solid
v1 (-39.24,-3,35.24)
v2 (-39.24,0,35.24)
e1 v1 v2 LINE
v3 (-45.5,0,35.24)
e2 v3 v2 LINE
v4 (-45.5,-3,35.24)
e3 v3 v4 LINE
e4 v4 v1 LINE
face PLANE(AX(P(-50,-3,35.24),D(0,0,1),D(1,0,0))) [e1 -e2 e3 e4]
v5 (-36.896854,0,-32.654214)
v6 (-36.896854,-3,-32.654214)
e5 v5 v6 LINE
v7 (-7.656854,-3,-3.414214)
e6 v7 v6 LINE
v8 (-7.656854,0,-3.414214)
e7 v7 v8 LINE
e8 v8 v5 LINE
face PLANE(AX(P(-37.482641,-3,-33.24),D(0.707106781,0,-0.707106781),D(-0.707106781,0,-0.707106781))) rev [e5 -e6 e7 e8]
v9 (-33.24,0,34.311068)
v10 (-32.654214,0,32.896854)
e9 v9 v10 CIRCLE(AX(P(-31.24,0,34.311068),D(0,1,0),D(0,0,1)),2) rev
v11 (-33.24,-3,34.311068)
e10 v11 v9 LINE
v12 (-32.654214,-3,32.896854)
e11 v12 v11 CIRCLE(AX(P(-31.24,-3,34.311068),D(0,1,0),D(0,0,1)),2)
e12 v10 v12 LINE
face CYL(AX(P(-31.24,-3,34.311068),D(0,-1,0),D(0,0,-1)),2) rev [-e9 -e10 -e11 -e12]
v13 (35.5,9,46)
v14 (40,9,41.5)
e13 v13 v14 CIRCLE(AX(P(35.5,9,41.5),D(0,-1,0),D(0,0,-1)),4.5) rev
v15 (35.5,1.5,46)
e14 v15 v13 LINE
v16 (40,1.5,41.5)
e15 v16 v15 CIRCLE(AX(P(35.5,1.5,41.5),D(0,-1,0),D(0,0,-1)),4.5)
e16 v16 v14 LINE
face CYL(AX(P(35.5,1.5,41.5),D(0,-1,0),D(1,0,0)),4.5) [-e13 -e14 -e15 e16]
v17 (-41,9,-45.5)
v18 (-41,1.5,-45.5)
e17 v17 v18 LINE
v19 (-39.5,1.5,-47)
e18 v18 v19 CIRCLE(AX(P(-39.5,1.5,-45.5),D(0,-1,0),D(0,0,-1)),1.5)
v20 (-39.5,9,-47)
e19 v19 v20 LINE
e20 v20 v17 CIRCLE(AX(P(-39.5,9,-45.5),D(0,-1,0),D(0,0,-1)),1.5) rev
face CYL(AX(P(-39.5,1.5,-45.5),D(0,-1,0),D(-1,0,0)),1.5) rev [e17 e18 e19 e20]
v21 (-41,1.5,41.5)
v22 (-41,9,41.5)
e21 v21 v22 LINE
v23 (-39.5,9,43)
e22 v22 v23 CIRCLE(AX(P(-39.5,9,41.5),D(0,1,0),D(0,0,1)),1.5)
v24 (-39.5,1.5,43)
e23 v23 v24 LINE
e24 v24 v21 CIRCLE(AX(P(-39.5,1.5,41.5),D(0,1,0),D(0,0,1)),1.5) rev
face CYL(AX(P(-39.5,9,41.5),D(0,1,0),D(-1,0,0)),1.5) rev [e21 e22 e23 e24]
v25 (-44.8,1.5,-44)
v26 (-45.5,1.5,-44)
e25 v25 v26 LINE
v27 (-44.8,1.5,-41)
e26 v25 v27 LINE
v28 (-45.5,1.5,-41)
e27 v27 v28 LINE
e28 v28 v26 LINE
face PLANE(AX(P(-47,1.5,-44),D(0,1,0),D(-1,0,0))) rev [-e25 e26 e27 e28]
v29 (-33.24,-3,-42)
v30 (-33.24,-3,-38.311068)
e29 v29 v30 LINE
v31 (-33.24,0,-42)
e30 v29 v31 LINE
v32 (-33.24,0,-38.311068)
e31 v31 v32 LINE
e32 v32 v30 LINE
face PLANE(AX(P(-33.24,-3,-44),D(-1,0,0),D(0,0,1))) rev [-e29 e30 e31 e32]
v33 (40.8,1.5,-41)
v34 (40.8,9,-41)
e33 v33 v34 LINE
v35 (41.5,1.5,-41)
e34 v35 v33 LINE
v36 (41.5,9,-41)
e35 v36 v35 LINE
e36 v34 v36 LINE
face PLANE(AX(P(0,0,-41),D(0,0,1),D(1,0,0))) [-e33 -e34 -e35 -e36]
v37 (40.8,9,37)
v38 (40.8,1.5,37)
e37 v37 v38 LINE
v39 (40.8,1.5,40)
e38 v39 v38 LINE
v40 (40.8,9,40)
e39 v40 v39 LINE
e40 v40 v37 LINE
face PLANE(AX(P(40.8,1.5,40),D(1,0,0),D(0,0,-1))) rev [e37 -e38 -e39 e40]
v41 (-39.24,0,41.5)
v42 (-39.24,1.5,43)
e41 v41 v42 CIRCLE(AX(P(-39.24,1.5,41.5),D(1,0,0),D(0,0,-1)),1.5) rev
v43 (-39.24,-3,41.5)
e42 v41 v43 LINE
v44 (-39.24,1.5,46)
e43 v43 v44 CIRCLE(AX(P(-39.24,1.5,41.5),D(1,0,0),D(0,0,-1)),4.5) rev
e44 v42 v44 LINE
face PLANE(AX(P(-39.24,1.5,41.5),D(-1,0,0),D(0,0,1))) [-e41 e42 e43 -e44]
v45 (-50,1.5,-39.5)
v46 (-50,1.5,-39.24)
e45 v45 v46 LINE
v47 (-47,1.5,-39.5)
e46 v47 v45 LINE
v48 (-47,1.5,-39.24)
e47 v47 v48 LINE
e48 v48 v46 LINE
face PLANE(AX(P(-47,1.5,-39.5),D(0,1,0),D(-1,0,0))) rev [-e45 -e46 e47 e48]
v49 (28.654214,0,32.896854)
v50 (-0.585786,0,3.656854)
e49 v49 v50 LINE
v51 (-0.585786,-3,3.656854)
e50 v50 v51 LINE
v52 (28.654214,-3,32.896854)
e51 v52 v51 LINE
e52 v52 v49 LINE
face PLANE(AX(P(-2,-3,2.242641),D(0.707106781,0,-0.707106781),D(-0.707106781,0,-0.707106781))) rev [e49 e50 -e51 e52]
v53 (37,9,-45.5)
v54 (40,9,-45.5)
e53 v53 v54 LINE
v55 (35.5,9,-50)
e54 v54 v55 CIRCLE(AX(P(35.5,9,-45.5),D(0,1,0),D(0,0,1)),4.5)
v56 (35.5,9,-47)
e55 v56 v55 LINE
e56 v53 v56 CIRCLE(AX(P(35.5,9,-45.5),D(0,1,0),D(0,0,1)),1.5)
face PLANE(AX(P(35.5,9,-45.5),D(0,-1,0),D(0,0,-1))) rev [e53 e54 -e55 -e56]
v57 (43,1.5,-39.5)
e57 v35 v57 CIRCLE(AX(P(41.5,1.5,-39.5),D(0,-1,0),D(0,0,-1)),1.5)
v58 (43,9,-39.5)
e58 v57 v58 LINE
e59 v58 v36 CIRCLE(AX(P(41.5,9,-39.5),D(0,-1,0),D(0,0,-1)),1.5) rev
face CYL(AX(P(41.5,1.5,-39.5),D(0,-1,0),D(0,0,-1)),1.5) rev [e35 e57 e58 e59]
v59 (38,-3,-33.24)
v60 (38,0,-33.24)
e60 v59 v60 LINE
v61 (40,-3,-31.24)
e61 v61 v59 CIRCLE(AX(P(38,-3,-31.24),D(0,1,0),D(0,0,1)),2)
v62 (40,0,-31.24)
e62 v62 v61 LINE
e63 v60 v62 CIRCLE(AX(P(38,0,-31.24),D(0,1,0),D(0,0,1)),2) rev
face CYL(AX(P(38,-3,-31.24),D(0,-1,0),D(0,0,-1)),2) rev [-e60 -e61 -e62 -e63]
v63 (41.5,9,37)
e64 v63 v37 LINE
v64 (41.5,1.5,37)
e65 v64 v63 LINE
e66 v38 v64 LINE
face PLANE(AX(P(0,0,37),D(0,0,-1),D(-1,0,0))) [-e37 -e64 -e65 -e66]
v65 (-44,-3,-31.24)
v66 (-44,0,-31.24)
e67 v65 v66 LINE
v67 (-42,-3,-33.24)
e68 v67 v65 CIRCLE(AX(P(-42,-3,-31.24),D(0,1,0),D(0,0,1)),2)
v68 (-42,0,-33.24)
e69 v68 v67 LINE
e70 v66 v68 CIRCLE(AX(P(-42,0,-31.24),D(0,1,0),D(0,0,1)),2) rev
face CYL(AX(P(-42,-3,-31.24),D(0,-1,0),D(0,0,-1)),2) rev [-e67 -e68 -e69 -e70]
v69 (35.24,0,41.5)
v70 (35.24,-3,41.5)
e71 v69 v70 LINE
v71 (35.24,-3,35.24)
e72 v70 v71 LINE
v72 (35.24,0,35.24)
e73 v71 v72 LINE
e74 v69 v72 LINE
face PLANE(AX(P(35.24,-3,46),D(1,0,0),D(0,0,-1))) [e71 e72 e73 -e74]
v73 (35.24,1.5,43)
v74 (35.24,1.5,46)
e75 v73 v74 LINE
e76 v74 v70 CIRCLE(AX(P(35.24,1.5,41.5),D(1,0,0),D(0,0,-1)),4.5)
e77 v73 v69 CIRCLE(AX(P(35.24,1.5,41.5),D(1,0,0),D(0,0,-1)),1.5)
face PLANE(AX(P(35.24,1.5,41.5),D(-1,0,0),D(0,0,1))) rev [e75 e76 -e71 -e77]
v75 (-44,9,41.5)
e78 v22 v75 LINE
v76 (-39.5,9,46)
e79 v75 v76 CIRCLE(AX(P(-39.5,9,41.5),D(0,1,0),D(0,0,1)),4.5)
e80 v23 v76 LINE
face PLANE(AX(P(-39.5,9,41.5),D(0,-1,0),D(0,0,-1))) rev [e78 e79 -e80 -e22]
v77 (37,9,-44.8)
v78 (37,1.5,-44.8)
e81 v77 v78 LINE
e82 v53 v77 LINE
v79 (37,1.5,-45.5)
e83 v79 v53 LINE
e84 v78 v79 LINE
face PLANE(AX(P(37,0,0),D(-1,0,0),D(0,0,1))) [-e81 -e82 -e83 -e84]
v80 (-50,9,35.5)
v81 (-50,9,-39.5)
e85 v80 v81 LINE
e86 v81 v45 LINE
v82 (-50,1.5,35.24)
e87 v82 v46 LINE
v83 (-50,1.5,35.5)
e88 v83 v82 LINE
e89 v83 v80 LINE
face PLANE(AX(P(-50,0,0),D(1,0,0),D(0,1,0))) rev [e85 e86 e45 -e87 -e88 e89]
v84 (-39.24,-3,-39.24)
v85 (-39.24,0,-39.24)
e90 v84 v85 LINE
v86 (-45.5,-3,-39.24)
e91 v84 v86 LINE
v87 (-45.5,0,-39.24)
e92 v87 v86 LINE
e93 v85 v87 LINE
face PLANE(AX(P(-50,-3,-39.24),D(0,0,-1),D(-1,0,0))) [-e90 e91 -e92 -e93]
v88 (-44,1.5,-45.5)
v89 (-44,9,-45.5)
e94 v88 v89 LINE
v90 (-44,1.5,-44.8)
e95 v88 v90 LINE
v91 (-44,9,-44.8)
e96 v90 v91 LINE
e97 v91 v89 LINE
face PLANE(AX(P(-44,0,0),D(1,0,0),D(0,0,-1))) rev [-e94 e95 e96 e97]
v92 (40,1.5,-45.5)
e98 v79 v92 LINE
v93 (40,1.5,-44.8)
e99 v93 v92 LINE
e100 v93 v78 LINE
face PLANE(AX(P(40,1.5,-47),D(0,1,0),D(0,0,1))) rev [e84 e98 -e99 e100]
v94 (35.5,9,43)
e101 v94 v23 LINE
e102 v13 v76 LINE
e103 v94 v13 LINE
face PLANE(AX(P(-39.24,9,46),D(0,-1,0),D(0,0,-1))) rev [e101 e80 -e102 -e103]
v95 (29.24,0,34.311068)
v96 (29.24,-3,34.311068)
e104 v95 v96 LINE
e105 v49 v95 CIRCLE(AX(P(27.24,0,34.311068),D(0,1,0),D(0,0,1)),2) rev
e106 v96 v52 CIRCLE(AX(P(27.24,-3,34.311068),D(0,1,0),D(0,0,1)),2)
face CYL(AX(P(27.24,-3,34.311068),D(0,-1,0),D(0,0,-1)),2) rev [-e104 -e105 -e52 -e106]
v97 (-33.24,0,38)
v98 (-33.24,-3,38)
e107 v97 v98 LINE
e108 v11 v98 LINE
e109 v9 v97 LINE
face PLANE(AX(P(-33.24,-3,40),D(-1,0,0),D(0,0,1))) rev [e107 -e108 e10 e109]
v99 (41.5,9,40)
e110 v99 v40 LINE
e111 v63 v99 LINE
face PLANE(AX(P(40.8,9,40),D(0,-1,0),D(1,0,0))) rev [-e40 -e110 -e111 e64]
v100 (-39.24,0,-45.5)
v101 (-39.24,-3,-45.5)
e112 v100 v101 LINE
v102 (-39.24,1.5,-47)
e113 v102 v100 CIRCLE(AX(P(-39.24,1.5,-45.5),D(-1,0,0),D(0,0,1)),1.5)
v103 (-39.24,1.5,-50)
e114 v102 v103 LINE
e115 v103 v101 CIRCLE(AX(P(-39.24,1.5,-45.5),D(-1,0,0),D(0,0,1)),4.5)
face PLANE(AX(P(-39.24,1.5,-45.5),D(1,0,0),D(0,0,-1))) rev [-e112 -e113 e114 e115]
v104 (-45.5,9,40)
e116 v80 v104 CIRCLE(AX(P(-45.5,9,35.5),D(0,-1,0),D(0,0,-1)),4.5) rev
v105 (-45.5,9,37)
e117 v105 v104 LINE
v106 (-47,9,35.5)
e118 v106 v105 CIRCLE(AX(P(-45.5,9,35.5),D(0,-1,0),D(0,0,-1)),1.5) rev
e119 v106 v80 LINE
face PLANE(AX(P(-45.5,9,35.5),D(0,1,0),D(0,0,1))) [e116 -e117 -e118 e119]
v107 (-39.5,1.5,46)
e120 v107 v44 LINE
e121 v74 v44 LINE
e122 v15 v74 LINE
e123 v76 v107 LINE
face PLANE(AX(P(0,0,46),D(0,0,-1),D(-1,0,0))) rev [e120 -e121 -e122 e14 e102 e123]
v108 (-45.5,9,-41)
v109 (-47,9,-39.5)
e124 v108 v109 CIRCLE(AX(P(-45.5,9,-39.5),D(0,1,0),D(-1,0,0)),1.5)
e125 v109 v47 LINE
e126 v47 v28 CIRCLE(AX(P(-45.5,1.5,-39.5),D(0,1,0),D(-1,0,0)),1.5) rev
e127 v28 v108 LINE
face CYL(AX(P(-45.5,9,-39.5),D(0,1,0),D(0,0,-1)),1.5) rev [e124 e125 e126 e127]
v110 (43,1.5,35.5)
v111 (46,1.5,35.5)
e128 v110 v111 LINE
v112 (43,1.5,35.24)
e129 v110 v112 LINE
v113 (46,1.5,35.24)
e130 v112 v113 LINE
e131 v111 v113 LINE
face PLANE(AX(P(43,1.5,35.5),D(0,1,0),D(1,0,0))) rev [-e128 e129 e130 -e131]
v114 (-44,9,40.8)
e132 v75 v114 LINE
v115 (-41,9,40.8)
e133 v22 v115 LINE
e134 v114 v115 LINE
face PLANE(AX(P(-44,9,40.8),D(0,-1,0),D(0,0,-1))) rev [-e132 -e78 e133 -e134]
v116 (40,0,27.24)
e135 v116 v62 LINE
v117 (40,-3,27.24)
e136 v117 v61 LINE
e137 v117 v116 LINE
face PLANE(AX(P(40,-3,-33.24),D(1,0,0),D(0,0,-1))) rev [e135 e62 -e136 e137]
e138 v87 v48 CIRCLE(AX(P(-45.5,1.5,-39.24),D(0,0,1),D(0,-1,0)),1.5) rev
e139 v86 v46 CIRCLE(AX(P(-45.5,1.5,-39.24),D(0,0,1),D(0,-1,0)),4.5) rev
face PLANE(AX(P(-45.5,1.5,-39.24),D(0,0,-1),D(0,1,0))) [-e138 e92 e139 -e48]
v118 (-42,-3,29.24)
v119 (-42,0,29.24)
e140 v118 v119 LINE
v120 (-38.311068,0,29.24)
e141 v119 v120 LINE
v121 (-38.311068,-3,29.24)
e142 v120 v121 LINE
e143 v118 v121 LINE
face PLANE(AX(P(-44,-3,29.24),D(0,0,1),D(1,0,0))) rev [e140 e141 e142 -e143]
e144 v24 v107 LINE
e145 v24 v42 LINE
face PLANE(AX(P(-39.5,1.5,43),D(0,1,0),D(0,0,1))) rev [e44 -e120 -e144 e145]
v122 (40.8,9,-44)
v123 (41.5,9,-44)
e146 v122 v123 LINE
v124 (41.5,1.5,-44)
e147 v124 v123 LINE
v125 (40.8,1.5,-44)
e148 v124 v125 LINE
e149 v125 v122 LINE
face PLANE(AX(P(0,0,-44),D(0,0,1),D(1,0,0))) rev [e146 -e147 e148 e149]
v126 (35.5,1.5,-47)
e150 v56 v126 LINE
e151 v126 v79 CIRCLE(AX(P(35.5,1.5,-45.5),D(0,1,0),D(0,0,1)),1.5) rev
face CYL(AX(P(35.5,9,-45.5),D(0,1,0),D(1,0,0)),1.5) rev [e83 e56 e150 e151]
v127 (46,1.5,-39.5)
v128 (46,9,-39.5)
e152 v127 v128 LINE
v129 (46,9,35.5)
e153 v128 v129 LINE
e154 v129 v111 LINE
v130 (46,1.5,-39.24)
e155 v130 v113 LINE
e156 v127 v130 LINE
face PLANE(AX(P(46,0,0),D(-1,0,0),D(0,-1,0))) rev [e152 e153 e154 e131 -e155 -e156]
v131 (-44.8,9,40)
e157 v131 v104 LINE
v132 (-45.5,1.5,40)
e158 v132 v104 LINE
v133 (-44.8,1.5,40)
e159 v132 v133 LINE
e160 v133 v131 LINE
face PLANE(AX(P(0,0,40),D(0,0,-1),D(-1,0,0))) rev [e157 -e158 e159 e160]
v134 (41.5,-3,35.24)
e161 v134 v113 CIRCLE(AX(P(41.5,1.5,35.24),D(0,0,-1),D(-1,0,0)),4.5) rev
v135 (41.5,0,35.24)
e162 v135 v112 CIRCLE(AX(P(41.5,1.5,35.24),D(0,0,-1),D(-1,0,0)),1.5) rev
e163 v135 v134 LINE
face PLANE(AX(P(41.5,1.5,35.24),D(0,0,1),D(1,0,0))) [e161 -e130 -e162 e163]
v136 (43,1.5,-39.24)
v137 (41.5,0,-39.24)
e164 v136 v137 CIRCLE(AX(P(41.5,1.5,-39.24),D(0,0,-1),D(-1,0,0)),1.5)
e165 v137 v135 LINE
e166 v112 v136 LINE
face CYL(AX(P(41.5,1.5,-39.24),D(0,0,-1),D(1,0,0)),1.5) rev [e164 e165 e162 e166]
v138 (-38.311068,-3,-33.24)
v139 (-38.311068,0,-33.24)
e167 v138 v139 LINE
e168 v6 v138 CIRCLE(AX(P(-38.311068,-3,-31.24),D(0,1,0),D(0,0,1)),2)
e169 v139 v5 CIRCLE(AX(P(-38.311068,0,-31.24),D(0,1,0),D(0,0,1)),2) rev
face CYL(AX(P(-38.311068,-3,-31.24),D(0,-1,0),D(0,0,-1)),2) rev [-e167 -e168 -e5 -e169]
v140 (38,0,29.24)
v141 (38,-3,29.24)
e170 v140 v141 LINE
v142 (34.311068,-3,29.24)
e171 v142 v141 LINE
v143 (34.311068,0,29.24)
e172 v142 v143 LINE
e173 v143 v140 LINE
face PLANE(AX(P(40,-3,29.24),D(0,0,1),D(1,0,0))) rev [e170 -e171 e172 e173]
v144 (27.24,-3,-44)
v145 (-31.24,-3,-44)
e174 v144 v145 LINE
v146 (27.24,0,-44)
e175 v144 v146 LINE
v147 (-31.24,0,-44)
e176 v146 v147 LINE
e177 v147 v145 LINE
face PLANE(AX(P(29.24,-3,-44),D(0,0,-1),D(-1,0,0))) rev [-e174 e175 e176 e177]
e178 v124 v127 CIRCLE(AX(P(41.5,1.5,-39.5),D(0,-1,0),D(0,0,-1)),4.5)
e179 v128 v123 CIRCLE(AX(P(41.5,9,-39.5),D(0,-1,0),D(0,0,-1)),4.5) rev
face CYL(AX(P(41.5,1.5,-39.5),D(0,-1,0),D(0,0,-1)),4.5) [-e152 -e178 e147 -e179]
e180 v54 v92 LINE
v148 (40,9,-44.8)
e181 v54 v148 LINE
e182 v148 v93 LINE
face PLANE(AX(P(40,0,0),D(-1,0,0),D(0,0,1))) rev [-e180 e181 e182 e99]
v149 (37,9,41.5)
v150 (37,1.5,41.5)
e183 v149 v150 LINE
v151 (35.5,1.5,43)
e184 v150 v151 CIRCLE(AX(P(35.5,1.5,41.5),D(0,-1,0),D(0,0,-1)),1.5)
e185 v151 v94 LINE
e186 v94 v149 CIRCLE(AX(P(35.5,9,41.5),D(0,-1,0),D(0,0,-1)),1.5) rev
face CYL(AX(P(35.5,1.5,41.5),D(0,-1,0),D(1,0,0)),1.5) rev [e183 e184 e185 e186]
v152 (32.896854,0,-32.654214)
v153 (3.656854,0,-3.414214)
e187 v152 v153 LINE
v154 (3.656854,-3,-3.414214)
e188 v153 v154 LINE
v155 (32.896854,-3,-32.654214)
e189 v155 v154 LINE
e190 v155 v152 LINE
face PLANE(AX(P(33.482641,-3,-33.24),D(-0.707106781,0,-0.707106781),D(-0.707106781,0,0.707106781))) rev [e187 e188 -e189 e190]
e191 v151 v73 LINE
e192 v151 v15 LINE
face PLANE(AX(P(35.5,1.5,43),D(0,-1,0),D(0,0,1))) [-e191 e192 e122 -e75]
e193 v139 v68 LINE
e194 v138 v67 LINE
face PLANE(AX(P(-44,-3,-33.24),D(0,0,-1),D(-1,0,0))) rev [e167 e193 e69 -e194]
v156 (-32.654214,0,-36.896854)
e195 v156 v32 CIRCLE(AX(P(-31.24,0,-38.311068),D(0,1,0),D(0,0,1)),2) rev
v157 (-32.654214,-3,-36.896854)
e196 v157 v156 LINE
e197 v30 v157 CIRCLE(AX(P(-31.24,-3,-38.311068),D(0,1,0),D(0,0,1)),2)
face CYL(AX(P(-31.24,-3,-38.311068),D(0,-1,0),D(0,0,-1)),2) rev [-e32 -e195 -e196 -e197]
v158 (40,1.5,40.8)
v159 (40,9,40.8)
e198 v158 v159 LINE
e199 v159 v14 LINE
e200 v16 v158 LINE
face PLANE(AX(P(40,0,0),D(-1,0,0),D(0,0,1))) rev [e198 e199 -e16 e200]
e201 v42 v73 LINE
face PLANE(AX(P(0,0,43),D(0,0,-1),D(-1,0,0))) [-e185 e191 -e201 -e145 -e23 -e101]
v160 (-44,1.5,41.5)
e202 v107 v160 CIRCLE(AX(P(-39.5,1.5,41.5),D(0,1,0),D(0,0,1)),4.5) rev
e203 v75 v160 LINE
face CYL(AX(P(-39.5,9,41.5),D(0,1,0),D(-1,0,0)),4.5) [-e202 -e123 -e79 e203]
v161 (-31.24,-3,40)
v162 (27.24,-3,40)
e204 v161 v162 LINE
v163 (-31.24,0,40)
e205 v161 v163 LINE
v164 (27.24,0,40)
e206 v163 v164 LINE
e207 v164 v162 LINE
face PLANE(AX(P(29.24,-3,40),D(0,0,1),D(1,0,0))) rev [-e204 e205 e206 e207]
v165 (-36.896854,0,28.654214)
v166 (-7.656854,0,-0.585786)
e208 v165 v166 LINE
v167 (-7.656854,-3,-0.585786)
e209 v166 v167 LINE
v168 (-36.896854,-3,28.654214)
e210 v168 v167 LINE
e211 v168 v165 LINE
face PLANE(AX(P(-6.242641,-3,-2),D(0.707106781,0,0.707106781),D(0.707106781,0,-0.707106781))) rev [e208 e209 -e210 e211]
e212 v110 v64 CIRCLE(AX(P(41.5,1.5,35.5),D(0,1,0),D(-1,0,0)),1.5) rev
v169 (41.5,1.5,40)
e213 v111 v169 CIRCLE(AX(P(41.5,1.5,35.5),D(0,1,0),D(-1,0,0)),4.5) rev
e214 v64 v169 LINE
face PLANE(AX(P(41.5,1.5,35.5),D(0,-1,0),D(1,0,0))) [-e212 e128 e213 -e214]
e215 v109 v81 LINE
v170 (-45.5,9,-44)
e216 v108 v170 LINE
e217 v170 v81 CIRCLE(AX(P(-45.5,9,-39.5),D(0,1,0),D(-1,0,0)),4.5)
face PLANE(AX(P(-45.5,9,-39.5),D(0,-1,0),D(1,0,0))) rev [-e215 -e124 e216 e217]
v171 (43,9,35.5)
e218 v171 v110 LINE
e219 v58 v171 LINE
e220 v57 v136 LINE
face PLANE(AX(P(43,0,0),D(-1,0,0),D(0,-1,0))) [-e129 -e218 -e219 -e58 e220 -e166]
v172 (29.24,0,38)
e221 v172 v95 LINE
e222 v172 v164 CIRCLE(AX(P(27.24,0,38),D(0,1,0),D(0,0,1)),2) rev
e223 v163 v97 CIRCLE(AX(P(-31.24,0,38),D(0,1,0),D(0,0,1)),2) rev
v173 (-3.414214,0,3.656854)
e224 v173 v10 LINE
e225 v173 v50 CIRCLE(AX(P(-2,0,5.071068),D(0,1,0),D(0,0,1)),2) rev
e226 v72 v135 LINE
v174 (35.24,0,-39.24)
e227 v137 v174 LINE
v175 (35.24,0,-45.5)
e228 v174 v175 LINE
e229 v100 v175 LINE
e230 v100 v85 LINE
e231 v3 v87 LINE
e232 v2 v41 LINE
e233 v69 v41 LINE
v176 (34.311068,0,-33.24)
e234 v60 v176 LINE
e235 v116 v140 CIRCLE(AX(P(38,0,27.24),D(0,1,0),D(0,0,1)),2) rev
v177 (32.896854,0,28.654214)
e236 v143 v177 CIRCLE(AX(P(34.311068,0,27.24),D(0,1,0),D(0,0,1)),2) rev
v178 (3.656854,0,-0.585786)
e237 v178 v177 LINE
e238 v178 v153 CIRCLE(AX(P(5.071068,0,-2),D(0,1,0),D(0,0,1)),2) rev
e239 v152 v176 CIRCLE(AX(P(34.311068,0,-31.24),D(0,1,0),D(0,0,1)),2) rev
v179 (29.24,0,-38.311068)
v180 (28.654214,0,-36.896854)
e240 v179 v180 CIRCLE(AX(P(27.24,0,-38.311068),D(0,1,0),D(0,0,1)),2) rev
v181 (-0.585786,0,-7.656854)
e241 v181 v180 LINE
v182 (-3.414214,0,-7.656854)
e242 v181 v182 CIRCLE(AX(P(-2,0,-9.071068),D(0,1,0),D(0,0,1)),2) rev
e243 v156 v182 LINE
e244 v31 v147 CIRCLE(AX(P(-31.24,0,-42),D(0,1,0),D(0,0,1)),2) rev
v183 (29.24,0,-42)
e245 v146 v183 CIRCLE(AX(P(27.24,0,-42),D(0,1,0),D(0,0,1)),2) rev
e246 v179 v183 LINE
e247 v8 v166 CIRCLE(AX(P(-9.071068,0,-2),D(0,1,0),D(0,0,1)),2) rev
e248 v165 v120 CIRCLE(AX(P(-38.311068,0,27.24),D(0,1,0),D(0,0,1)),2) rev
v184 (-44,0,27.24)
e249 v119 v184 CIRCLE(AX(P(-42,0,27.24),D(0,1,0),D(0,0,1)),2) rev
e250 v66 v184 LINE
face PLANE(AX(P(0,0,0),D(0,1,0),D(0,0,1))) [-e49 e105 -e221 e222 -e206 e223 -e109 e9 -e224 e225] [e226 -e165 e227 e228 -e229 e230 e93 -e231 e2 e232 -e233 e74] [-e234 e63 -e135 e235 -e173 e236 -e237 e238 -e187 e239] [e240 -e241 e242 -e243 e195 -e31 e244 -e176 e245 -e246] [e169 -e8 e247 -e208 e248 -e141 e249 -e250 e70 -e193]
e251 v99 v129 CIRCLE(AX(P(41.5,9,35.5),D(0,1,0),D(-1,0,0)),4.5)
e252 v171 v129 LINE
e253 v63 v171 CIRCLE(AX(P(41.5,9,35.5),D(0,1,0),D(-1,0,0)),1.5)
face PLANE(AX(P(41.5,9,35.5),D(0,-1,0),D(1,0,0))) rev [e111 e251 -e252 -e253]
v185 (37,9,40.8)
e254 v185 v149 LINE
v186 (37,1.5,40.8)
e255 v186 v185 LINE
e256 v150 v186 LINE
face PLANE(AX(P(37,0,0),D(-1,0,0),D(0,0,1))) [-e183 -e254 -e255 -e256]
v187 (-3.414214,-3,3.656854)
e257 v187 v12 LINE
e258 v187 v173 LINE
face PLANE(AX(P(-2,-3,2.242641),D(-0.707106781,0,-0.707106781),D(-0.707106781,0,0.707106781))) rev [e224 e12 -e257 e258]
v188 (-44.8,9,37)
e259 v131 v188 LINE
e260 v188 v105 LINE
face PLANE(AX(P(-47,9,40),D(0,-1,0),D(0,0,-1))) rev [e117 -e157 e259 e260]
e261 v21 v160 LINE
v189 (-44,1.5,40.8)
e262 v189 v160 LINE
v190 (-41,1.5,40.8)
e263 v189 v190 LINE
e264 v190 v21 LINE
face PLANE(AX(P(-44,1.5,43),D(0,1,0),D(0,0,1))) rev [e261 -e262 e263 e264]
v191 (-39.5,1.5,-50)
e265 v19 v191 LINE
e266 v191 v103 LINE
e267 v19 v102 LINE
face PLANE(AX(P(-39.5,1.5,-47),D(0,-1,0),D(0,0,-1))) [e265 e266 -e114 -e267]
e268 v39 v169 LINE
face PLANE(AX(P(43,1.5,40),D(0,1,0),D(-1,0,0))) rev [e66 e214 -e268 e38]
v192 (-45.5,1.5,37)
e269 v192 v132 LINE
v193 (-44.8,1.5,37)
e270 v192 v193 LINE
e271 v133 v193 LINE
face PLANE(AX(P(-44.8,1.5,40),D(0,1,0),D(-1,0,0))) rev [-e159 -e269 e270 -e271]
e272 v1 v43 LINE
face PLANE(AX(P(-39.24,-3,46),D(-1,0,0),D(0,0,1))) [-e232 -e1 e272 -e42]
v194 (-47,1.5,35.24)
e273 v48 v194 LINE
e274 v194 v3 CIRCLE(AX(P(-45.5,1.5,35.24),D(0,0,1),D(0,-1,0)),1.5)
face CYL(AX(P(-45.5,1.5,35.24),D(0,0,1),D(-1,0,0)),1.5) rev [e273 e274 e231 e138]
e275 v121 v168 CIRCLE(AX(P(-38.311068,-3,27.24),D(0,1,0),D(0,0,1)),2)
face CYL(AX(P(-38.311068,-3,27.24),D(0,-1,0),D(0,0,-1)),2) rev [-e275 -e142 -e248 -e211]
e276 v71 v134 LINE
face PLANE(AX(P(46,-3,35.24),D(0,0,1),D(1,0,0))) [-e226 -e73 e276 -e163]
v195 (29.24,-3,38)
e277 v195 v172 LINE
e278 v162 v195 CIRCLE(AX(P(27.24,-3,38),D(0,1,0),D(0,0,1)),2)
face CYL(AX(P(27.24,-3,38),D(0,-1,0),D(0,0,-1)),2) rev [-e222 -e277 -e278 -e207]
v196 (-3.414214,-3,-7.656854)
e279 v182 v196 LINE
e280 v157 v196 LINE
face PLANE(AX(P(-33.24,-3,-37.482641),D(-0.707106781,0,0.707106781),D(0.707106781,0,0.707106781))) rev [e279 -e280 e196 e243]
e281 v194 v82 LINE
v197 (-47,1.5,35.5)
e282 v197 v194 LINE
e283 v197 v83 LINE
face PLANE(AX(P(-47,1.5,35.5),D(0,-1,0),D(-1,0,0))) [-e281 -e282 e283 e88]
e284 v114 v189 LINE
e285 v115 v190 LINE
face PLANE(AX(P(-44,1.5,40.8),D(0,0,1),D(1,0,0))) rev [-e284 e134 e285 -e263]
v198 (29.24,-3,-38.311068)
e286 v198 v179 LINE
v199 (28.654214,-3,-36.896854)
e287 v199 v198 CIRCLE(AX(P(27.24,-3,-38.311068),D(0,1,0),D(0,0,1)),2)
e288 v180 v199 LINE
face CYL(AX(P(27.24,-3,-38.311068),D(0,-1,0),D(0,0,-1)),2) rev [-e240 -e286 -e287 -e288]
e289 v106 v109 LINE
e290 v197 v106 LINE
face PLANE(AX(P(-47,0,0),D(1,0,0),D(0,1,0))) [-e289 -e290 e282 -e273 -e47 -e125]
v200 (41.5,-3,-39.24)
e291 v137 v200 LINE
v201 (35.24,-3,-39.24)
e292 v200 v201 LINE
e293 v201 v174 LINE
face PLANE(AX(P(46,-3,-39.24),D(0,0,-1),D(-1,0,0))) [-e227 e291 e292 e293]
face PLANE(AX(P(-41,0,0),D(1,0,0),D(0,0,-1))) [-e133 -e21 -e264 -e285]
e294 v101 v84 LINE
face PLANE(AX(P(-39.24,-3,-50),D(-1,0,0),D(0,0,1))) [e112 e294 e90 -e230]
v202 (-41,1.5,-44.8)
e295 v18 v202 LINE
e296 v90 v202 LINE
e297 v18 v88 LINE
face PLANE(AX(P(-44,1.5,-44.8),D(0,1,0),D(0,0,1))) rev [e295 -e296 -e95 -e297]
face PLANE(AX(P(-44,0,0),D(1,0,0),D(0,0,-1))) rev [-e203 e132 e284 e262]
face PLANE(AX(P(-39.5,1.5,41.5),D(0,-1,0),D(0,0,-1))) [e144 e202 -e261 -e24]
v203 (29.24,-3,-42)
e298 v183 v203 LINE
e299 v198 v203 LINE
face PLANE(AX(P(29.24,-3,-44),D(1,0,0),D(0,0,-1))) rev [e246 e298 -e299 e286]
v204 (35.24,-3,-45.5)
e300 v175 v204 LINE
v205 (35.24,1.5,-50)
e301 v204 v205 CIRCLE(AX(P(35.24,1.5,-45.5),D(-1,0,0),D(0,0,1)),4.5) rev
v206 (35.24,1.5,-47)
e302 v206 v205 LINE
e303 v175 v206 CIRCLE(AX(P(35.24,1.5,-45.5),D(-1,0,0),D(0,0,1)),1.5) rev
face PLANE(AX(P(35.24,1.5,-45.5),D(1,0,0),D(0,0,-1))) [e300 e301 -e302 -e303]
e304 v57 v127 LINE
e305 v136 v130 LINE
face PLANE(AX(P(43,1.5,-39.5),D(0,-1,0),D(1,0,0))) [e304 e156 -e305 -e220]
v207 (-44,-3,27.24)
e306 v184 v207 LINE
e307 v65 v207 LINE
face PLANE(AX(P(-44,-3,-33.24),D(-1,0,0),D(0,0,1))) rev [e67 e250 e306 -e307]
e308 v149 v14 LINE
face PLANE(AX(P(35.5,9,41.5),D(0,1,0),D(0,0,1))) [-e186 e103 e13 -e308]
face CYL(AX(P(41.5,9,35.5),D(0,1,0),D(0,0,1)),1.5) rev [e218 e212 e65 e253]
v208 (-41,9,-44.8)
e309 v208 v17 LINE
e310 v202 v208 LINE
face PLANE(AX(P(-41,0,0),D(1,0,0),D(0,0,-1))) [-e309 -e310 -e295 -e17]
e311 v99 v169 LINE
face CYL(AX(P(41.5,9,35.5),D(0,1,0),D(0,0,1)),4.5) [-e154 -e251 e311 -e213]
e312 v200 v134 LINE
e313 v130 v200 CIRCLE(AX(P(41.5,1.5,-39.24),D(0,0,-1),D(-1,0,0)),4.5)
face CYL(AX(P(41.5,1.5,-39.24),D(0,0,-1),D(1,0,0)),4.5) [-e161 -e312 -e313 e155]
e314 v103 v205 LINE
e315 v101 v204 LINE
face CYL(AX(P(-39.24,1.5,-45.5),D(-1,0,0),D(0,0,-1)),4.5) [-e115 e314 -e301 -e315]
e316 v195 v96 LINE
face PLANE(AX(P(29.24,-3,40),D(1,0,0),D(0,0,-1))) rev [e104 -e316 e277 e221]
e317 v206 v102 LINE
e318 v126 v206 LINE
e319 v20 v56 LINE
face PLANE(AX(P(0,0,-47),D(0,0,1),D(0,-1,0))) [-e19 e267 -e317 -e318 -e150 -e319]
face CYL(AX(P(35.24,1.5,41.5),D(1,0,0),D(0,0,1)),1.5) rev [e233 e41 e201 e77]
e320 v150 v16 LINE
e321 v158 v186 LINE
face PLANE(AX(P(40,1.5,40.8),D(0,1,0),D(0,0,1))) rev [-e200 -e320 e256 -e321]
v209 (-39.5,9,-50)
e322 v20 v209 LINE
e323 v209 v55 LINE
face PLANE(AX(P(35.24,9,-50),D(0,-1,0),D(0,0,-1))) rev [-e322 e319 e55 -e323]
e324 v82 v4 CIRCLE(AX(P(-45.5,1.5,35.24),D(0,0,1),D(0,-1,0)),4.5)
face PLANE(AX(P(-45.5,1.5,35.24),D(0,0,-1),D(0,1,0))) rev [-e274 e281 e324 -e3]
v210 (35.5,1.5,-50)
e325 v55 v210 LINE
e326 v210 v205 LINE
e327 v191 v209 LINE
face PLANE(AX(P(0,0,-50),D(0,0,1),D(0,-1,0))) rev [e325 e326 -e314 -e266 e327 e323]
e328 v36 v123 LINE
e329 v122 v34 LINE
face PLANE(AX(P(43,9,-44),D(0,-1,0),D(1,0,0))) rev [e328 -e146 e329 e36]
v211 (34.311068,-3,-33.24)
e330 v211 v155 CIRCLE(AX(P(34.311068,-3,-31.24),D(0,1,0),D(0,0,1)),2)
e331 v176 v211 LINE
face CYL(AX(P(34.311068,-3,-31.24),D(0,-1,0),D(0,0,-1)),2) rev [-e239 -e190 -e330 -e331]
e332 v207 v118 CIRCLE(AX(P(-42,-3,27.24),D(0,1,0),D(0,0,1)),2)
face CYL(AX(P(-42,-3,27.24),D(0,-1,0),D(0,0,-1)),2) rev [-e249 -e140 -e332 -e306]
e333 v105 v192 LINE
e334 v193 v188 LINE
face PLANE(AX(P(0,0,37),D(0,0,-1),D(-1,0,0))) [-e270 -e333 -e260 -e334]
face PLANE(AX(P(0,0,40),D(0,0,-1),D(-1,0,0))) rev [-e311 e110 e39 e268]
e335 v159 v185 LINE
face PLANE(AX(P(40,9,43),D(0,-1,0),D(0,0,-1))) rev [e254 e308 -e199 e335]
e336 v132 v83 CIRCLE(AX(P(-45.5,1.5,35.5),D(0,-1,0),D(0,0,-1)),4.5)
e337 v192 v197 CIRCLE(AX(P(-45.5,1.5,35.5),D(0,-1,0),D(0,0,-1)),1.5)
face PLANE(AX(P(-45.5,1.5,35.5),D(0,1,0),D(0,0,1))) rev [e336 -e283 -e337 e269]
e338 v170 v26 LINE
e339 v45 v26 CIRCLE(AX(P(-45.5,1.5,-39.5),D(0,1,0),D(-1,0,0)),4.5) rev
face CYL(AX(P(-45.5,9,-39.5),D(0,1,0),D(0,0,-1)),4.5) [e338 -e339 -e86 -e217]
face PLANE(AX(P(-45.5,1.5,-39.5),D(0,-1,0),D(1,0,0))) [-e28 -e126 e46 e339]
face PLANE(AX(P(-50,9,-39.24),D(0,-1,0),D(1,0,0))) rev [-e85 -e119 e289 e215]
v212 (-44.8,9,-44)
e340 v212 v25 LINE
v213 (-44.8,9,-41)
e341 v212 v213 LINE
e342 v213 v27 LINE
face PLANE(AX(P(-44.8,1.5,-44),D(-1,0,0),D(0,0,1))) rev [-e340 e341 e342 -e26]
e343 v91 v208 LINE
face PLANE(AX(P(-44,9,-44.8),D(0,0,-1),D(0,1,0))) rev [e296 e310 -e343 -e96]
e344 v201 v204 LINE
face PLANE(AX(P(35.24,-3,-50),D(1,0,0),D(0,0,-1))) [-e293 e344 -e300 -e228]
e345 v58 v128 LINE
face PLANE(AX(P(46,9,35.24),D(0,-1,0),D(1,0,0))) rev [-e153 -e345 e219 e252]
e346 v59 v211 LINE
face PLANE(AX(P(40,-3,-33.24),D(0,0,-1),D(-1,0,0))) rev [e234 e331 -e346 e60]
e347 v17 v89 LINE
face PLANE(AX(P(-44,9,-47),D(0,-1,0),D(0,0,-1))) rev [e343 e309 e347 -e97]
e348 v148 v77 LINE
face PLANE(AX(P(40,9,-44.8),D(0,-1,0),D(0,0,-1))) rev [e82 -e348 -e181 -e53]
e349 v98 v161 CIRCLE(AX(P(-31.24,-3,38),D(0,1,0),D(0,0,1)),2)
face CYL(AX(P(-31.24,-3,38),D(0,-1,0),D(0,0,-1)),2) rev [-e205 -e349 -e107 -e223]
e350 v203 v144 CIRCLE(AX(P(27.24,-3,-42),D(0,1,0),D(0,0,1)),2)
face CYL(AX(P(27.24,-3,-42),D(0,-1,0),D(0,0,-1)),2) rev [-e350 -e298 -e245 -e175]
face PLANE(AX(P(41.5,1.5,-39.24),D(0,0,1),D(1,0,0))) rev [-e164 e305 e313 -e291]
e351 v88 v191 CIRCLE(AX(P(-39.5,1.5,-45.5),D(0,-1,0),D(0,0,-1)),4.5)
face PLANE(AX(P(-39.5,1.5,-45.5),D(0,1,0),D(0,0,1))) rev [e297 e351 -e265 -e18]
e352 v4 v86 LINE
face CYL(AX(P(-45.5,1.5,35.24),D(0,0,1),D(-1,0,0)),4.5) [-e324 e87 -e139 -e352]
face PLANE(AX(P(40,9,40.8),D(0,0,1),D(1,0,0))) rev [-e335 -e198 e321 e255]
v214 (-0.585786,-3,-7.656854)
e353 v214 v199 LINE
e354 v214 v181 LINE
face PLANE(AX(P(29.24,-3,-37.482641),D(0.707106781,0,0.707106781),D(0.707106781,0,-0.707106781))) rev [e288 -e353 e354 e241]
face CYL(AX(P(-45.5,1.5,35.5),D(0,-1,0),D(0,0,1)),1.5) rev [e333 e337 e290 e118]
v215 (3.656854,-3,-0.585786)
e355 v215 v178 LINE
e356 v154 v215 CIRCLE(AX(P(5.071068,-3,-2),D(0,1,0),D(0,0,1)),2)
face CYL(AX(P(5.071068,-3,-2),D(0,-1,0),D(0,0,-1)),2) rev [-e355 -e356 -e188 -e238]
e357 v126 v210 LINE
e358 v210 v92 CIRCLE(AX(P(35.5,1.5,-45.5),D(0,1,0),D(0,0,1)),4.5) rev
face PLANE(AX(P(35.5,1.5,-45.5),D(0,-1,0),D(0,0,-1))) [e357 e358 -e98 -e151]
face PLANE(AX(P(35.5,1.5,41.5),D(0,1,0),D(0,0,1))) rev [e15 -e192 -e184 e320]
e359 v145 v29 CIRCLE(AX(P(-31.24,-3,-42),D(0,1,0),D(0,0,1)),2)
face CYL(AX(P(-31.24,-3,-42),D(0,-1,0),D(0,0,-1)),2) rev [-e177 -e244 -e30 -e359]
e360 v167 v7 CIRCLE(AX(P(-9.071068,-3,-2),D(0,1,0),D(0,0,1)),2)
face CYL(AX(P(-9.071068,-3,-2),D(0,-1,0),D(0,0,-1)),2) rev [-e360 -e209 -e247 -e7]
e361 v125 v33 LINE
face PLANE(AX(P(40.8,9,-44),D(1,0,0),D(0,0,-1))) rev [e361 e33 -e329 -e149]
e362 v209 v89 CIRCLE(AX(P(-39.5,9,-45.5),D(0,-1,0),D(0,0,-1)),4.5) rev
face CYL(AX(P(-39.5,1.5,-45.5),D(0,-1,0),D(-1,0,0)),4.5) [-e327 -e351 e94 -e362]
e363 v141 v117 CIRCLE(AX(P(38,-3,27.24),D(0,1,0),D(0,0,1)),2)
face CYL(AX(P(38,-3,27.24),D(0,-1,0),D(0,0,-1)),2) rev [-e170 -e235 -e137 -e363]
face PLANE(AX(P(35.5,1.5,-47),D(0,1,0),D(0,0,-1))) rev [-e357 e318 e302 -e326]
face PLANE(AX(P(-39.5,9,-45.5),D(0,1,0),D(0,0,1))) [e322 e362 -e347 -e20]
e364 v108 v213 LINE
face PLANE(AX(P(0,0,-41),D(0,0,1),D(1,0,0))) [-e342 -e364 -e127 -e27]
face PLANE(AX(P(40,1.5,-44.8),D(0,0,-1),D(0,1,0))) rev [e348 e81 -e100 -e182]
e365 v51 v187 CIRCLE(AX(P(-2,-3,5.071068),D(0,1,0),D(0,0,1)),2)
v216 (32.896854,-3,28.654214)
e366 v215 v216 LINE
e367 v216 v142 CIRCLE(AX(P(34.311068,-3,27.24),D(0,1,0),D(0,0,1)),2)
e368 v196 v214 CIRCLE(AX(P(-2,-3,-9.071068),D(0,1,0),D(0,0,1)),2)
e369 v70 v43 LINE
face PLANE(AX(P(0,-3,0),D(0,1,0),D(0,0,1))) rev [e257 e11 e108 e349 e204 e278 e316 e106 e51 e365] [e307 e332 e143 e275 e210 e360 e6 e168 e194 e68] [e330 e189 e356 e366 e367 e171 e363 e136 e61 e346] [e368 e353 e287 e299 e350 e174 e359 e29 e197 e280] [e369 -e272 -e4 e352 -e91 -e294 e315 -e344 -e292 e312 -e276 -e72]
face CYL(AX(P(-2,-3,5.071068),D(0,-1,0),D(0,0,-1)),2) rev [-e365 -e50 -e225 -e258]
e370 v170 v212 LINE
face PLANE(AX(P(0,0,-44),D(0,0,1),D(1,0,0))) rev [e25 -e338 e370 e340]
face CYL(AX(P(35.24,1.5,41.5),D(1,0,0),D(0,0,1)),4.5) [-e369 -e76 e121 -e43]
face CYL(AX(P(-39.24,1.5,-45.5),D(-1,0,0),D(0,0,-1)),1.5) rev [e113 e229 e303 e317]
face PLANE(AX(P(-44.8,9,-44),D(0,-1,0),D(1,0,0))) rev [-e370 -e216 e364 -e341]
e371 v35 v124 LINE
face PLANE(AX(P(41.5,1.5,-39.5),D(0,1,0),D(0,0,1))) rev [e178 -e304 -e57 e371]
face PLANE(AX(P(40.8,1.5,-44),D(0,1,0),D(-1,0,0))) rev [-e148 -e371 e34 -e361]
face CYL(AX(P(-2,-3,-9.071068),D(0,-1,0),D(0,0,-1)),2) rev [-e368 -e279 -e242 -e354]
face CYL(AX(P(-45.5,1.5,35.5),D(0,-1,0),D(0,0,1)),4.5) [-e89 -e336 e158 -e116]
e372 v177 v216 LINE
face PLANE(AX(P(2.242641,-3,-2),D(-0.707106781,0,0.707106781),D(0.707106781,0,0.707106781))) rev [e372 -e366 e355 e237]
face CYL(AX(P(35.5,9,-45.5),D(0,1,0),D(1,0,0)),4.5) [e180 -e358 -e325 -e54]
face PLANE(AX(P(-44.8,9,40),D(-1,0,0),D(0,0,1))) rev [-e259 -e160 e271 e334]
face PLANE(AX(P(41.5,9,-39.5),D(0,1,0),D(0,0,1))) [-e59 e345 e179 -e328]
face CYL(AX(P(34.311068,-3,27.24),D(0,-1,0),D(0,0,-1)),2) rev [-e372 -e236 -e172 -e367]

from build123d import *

# Parameters (mm, degrees)
BASE_FLANGE1_DEPTH             = 3
FILLET1_R                      = 2
EDGE_FLANGE1_STRIP_W           = 15
EDGE_FLANGE1_STRIP_H           = 3
EDGE_FLANGE1_STRIP_CUT_DEPTH   = 74.48
EDGE_FLANGE1_STRIP_2_W         = 15
EDGE_FLANGE1_STRIP_2_H         = 3
EDGE_FLANGE1_STRIP_CUT_2_DEPTH = 74.48
EDGE_FLANGE1_STRIP_3_W         = 15
EDGE_FLANGE1_STRIP_3_H         = 3
EDGE_FLANGE1_STRIP_CUT_3_DEPTH = 74.48
EDGE_FLANGE1_STRIP_4_W         = 15
EDGE_FLANGE1_STRIP_4_H         = 3
EDGE_FLANGE1_STRIP_CUT_4_DEPTH = 74.48
EDGE_FLANGE1_DEPTH             = 74.48
EDGE_FLANGE1_BEND_DEPTH        = 74.48
EDGE_FLANGE1_BEND_2_DEPTH      = 74.48
EDGE_FLANGE1_BEND_3_DEPTH      = 74.48
EDGE_FLANGE2_DEPTH             = 7.5
EDGE_FLANGE2_BEND_DEPTH        = 7.5
EDGE_FLANGE2_BEND_2_DEPTH      = 7.5
EDGE_FLANGE2_BEND_3_DEPTH      = 7.5
EDGE_FLANGE2_BEND_4_DEPTH      = 7.5
EDGE_FLANGE2_BEND_5_DEPTH      = 7.5
EDGE_FLANGE2_BEND_6_DEPTH      = 7.5
EDGE_FLANGE2_BEND_7_DEPTH      = 7.5


# Sheet-metal steps are written as plain solids
with BuildPart() as part:
    # Sketch1 → Base-Flange1 (new body)
    with BuildSketch(Plane(origin=(0, 0, 0), x_dir=(1, 0, 0), z_dir=(0, 1, 0))):
        Polygon((-50, 39.24), (-39.24, 39.24), (-39.24, 50), (35.24, 50), (35.24, 39.24), (46, 39.24), (46, -35.24), (35.24, -35.24), (35.24, -46), (-39.24, -46), (-39.24, -35.24), (-50, -35.24), align=None)
        Polygon((-37.482640687, 33.24), (-6.242640687, 2), (-37.482640687, -29.24), (-44, -29.24), (-44, 33.24), align=None, mode=Mode.SUBTRACT)
        Polygon((-33.24, 37.482640687), (-2, 6.242640687), (29.24, 37.482640687), (29.24, 44), (-33.24, 44), align=None, mode=Mode.SUBTRACT)
        Polygon((33.482640687, 33.24), (2.242640687, 2), (33.482640687, -29.24), (40, -29.24), (40, 33.24), align=None, mode=Mode.SUBTRACT)
        Polygon((-33.24, -40), (-33.24, -33.482640687), (-2, -2.242640687), (29.24, -33.482640687), (29.24, -40), align=None, mode=Mode.SUBTRACT)
    extrude(amount=-BASE_FLANGE1_DEPTH)

    # Fillet1
    fillet1_edges = [part.edges().sort_by_distance(p)[0] for p in [
        (29.24, -1.5, -44),
        (29.24, -1.5, -37.482640687),
        (-2, -1.5, -6.242640687),
        (-33.24, -1.5, -37.482640687),
        (-33.24, -1.5, -44),
        (-44, -1.5, 29.24),
        (-44, -1.5, -33.24),
        (-37.482640687, -1.5, -33.24),
        (-6.242640687, -1.5, -2),
        (-37.482640687, -1.5, 29.24),
        (29.24, -1.5, 40),
        (-33.24, -1.5, 40),
        (-33.24, -1.5, 33.482640687),
        (-2, -1.5, 2.242640687),
        (29.24, -1.5, 33.482640687),
        (40, -1.5, -33.24),
        (40, -1.5, 29.24),
        (33.482640687, -1.5, 29.24),
        (2.242640687, -1.5, -2),
        (33.482640687, -1.5, -33.24),
    ]]
    fillet(fillet1_edges, radius=FILLET1_R)

    # Edge-Flange1 strip (across the edge) → Edge-Flange1 strip cut (cut)
    with BuildSketch(Plane(origin=(-50, 0, -39.24), x_dir=(1, 0, 0), z_dir=(0, 0, 1))):
        with Locations((-3, -1.5)):
            Rectangle(EDGE_FLANGE1_STRIP_W, EDGE_FLANGE1_STRIP_H)
    extrude(amount=EDGE_FLANGE1_STRIP_CUT_DEPTH, mode=Mode.SUBTRACT)

    # Edge-Flange1 strip 2 (across the edge) → Edge-Flange1 strip cut 2 (cut)
    with BuildSketch(Plane(origin=(46, 0, 35.24), x_dir=(-1, 0, 0), z_dir=(0, 0, -1))):
        with Locations((-3, -1.5)):
            Rectangle(EDGE_FLANGE1_STRIP_2_W, EDGE_FLANGE1_STRIP_2_H)
    extrude(amount=EDGE_FLANGE1_STRIP_CUT_2_DEPTH, mode=Mode.SUBTRACT)

    # Edge-Flange1 strip 3 (across the edge) → Edge-Flange1 strip cut 3 (cut)
    with BuildSketch(Plane(origin=(-39.24, 0, 46), x_dir=(0, 0, -1), z_dir=(1, 0, 0))):
        with Locations((-3, -1.5)):
            Rectangle(EDGE_FLANGE1_STRIP_3_W, EDGE_FLANGE1_STRIP_3_H)
    extrude(amount=EDGE_FLANGE1_STRIP_CUT_3_DEPTH, mode=Mode.SUBTRACT)

    # Edge-Flange1 strip 4 (across the edge) → Edge-Flange1 strip cut 4 (cut)
    with BuildSketch(Plane(origin=(35.24, 0, -50), x_dir=(0, 0, 1), z_dir=(-1, 0, 0))):
        with Locations((-3, -1.5)):
            Rectangle(EDGE_FLANGE1_STRIP_4_W, EDGE_FLANGE1_STRIP_4_H)
    extrude(amount=EDGE_FLANGE1_STRIP_CUT_4_DEPTH, mode=Mode.SUBTRACT)

    # Edge-Flange1 section (across the edge) → Edge-Flange1 (add)
    with BuildSketch(Plane(origin=(-50, 0, -39.24), x_dir=(1, 0, 0), z_dir=(0, 0, 1))):
        with BuildLine():
            Line((0, 1.5), (0, 9))
            Line((0, 9), (3, 9))
            Line((3, 9), (3, 1.5))
            ThreePointArc((3, 1.5), (3.439339828, 0.439339828), (4.5, 0))
            Line((4.5, 0), (4.5, -3))
            ThreePointArc((4.5, -3), (1.318019485, -1.681980515), (0, 1.5))
        make_face()
    extrude(amount=EDGE_FLANGE1_DEPTH)

    # Edge-Flange1 section 2 (across the edge) → Edge-Flange1 bend (add)
    with BuildSketch(Plane(origin=(46, 0, 35.24), x_dir=(-1, 0, 0), z_dir=(0, 0, -1))):
        with BuildLine():
            Line((0, 1.5), (0, 9))
            Line((0, 9), (3, 9))
            Line((3, 9), (3, 1.5))
            ThreePointArc((3, 1.5), (3.439339828, 0.439339828), (4.5, 0))
            Line((4.5, 0), (4.5, -3))
            ThreePointArc((4.5, -3), (1.318019485, -1.681980515), (0, 1.5))
        make_face()
    extrude(amount=EDGE_FLANGE1_BEND_DEPTH)

    # Edge-Flange1 section 3 (across the edge) → Edge-Flange1 bend 2 (add)
    with BuildSketch(Plane(origin=(-39.24, 0, 46), x_dir=(0, 0, -1), z_dir=(1, 0, 0))):
        with BuildLine():
            Line((0, 1.5), (0, 9))
            Line((0, 9), (3, 9))
            Line((3, 9), (3, 1.5))
            ThreePointArc((3, 1.5), (3.439339828, 0.439339828), (4.5, 0))
            Line((4.5, 0), (4.5, -3))
            ThreePointArc((4.5, -3), (1.318019485, -1.681980515), (0, 1.5))
        make_face()
    extrude(amount=EDGE_FLANGE1_BEND_2_DEPTH)

    # Edge-Flange1 section 4 (across the edge) → Edge-Flange1 bend 3 (add)
    with BuildSketch(Plane(origin=(35.24, 0, -50), x_dir=(0, 0, 1), z_dir=(-1, 0, 0))):
        with BuildLine():
            Line((0, 1.5), (0, 9))
            Line((0, 9), (3, 9))
            Line((3, 9), (3, 1.5))
            ThreePointArc((3, 1.5), (3.439339828, 0.439339828), (4.5, 0))
            Line((4.5, 0), (4.5, -3))
            ThreePointArc((4.5, -3), (1.318019485, -1.681980515), (0, 1.5))
        make_face()
    extrude(amount=EDGE_FLANGE1_BEND_3_DEPTH)

    # Edge-Flange2 section (across the edge) → Edge-Flange2 (add)
    with BuildSketch(Plane(origin=(43, 9, -41), x_dir=(0, 0, 1), z_dir=(0, -1, 0))):
        with BuildLine():
            Line((-3, 1.5), (-3, 2.2))
            Line((-3, 2.2), (0, 2.2))
            Line((0, 2.2), (0, 1.5))
            ThreePointArc((0, 1.5), (0.439339828, 0.439339828), (1.5, 0))
            Line((1.5, 0), (1.76, 0))
            Line((1.76, 0), (1.76, -3))
            Line((1.76, -3), (1.5, -3))
            ThreePointArc((1.5, -3), (-1.681980515, -1.681980515), (-3, 1.5))
        make_face()
    extrude(amount=EDGE_FLANGE2_DEPTH)

    # Edge-Flange2 section 2 (across the edge) → Edge-Flange2 bend (add)
    with BuildSketch(Plane(origin=(37, 1.5, -47), x_dir=(-1, 0, 0), z_dir=(0, 1, 0))):
        with BuildLine():
            Line((-3, 1.5), (-3, 2.2))
            Line((-3, 2.2), (0, 2.2))
            Line((0, 2.2), (0, 1.5))
            ThreePointArc((0, 1.5), (0.439339828, 0.439339828), (1.5, 0))
            Line((1.5, 0), (1.76, 0))
            Line((1.76, 0), (1.76, -3))
            Line((1.76, -3), (1.5, -3))
            ThreePointArc((1.5, -3), (-1.681980515, -1.681980515), (-3, 1.5))
        make_face()
    extrude(amount=EDGE_FLANGE2_BEND_DEPTH)

    # Edge-Flange2 section 3 (across the edge) → Edge-Flange2 bend 2 (add)
    with BuildSketch(Plane(origin=(-41, 9, -47), x_dir=(1, 0, 0), z_dir=(0, -1, 0))):
        with BuildLine():
            Line((-3, 1.5), (-3, 2.2))
            Line((-3, 2.2), (0, 2.2))
            Line((0, 2.2), (0, 1.5))
            ThreePointArc((0, 1.5), (0.439339828, 0.439339828), (1.5, 0))
            Line((1.5, 0), (1.76, 0))
            Line((1.76, 0), (1.76, -3))
            Line((1.76, -3), (1.5, -3))
            ThreePointArc((1.5, -3), (-1.681980515, -1.681980515), (-3, 1.5))
        make_face()
    extrude(amount=EDGE_FLANGE2_BEND_2_DEPTH)

    # Edge-Flange2 section 4 (across the edge) → Edge-Flange2 bend 3 (add)
    with BuildSketch(Plane(origin=(-47, 1.5, -41), x_dir=(0, 0, 1), z_dir=(0, 1, 0))):
        with BuildLine():
            Line((-3, 1.5), (-3, 2.2))
            Line((-3, 2.2), (0, 2.2))
            Line((0, 2.2), (0, 1.5))
            ThreePointArc((0, 1.5), (0.439339828, 0.439339828), (1.5, 0))
            Line((1.5, 0), (1.76, 0))
            Line((1.76, 0), (1.76, -3))
            Line((1.76, -3), (1.5, -3))
            ThreePointArc((1.5, -3), (-1.681980515, -1.681980515), (-3, 1.5))
        make_face()
    extrude(amount=EDGE_FLANGE2_BEND_3_DEPTH)

    # Edge-Flange2 section 5 (across the edge) → Edge-Flange2 bend 4 (add)
    with BuildSketch(Plane(origin=(-47, 9, 37), x_dir=(0, 0, -1), z_dir=(0, -1, 0))):
        with BuildLine():
            Line((-3, 1.5), (-3, 2.2))
            Line((-3, 2.2), (0, 2.2))
            Line((0, 2.2), (0, 1.5))
            ThreePointArc((0, 1.5), (0.439339828, 0.439339828), (1.5, 0))
            Line((1.5, 0), (1.76, 0))
            Line((1.76, 0), (1.76, -3))
            Line((1.76, -3), (1.5, -3))
            ThreePointArc((1.5, -3), (-1.681980515, -1.681980515), (-3, 1.5))
        make_face()
    extrude(amount=EDGE_FLANGE2_BEND_4_DEPTH)

    # Edge-Flange2 section 6 (across the edge) → Edge-Flange2 bend 5 (add)
    with BuildSketch(Plane(origin=(-41, 1.5, 43), x_dir=(1, 0, 0), z_dir=(0, 1, 0))):
        with BuildLine():
            Line((-3, 1.5), (-3, 2.2))
            Line((-3, 2.2), (0, 2.2))
            Line((0, 2.2), (0, 1.5))
            ThreePointArc((0, 1.5), (0.439339828, 0.439339828), (1.5, 0))
            Line((1.5, 0), (1.76, 0))
            Line((1.76, 0), (1.76, -3))
            Line((1.76, -3), (1.5, -3))
            ThreePointArc((1.5, -3), (-1.681980515, -1.681980515), (-3, 1.5))
        make_face()
    extrude(amount=EDGE_FLANGE2_BEND_5_DEPTH)

    # Edge-Flange2 section 7 (across the edge) → Edge-Flange2 bend 6 (add)
    with BuildSketch(Plane(origin=(37, 9, 43), x_dir=(-1, 0, 0), z_dir=(0, -1, 0))):
        with BuildLine():
            Line((-3, 1.5), (-3, 2.2))
            Line((-3, 2.2), (0, 2.2))
            Line((0, 2.2), (0, 1.5))
            ThreePointArc((0, 1.5), (0.439339828, 0.439339828), (1.5, 0))
            Line((1.5, 0), (1.76, 0))
            Line((1.76, 0), (1.76, -3))
            Line((1.76, -3), (1.5, -3))
            ThreePointArc((1.5, -3), (-1.681980515, -1.681980515), (-3, 1.5))
        make_face()
    extrude(amount=EDGE_FLANGE2_BEND_6_DEPTH)

    # Edge-Flange2 section 8 (across the edge) → Edge-Flange2 bend 7 (add)
    with BuildSketch(Plane(origin=(43, 1.5, 37), x_dir=(0, 0, -1), z_dir=(0, 1, 0))):
        with BuildLine():
            Line((-3, 1.5), (-3, 2.2))
            Line((-3, 2.2), (0, 2.2))
            Line((0, 2.2), (0, 1.5))
            ThreePointArc((0, 1.5), (0.439339828, 0.439339828), (1.5, 0))
            Line((1.5, 0), (1.76, 0))
            Line((1.76, 0), (1.76, -3))
            Line((1.76, -3), (1.5, -3))
            ThreePointArc((1.5, -3), (-1.681980515, -1.681980515), (-3, 1.5))
        make_face()
    extrude(amount=EDGE_FLANGE2_BEND_7_DEPTH)


solid = part.part
